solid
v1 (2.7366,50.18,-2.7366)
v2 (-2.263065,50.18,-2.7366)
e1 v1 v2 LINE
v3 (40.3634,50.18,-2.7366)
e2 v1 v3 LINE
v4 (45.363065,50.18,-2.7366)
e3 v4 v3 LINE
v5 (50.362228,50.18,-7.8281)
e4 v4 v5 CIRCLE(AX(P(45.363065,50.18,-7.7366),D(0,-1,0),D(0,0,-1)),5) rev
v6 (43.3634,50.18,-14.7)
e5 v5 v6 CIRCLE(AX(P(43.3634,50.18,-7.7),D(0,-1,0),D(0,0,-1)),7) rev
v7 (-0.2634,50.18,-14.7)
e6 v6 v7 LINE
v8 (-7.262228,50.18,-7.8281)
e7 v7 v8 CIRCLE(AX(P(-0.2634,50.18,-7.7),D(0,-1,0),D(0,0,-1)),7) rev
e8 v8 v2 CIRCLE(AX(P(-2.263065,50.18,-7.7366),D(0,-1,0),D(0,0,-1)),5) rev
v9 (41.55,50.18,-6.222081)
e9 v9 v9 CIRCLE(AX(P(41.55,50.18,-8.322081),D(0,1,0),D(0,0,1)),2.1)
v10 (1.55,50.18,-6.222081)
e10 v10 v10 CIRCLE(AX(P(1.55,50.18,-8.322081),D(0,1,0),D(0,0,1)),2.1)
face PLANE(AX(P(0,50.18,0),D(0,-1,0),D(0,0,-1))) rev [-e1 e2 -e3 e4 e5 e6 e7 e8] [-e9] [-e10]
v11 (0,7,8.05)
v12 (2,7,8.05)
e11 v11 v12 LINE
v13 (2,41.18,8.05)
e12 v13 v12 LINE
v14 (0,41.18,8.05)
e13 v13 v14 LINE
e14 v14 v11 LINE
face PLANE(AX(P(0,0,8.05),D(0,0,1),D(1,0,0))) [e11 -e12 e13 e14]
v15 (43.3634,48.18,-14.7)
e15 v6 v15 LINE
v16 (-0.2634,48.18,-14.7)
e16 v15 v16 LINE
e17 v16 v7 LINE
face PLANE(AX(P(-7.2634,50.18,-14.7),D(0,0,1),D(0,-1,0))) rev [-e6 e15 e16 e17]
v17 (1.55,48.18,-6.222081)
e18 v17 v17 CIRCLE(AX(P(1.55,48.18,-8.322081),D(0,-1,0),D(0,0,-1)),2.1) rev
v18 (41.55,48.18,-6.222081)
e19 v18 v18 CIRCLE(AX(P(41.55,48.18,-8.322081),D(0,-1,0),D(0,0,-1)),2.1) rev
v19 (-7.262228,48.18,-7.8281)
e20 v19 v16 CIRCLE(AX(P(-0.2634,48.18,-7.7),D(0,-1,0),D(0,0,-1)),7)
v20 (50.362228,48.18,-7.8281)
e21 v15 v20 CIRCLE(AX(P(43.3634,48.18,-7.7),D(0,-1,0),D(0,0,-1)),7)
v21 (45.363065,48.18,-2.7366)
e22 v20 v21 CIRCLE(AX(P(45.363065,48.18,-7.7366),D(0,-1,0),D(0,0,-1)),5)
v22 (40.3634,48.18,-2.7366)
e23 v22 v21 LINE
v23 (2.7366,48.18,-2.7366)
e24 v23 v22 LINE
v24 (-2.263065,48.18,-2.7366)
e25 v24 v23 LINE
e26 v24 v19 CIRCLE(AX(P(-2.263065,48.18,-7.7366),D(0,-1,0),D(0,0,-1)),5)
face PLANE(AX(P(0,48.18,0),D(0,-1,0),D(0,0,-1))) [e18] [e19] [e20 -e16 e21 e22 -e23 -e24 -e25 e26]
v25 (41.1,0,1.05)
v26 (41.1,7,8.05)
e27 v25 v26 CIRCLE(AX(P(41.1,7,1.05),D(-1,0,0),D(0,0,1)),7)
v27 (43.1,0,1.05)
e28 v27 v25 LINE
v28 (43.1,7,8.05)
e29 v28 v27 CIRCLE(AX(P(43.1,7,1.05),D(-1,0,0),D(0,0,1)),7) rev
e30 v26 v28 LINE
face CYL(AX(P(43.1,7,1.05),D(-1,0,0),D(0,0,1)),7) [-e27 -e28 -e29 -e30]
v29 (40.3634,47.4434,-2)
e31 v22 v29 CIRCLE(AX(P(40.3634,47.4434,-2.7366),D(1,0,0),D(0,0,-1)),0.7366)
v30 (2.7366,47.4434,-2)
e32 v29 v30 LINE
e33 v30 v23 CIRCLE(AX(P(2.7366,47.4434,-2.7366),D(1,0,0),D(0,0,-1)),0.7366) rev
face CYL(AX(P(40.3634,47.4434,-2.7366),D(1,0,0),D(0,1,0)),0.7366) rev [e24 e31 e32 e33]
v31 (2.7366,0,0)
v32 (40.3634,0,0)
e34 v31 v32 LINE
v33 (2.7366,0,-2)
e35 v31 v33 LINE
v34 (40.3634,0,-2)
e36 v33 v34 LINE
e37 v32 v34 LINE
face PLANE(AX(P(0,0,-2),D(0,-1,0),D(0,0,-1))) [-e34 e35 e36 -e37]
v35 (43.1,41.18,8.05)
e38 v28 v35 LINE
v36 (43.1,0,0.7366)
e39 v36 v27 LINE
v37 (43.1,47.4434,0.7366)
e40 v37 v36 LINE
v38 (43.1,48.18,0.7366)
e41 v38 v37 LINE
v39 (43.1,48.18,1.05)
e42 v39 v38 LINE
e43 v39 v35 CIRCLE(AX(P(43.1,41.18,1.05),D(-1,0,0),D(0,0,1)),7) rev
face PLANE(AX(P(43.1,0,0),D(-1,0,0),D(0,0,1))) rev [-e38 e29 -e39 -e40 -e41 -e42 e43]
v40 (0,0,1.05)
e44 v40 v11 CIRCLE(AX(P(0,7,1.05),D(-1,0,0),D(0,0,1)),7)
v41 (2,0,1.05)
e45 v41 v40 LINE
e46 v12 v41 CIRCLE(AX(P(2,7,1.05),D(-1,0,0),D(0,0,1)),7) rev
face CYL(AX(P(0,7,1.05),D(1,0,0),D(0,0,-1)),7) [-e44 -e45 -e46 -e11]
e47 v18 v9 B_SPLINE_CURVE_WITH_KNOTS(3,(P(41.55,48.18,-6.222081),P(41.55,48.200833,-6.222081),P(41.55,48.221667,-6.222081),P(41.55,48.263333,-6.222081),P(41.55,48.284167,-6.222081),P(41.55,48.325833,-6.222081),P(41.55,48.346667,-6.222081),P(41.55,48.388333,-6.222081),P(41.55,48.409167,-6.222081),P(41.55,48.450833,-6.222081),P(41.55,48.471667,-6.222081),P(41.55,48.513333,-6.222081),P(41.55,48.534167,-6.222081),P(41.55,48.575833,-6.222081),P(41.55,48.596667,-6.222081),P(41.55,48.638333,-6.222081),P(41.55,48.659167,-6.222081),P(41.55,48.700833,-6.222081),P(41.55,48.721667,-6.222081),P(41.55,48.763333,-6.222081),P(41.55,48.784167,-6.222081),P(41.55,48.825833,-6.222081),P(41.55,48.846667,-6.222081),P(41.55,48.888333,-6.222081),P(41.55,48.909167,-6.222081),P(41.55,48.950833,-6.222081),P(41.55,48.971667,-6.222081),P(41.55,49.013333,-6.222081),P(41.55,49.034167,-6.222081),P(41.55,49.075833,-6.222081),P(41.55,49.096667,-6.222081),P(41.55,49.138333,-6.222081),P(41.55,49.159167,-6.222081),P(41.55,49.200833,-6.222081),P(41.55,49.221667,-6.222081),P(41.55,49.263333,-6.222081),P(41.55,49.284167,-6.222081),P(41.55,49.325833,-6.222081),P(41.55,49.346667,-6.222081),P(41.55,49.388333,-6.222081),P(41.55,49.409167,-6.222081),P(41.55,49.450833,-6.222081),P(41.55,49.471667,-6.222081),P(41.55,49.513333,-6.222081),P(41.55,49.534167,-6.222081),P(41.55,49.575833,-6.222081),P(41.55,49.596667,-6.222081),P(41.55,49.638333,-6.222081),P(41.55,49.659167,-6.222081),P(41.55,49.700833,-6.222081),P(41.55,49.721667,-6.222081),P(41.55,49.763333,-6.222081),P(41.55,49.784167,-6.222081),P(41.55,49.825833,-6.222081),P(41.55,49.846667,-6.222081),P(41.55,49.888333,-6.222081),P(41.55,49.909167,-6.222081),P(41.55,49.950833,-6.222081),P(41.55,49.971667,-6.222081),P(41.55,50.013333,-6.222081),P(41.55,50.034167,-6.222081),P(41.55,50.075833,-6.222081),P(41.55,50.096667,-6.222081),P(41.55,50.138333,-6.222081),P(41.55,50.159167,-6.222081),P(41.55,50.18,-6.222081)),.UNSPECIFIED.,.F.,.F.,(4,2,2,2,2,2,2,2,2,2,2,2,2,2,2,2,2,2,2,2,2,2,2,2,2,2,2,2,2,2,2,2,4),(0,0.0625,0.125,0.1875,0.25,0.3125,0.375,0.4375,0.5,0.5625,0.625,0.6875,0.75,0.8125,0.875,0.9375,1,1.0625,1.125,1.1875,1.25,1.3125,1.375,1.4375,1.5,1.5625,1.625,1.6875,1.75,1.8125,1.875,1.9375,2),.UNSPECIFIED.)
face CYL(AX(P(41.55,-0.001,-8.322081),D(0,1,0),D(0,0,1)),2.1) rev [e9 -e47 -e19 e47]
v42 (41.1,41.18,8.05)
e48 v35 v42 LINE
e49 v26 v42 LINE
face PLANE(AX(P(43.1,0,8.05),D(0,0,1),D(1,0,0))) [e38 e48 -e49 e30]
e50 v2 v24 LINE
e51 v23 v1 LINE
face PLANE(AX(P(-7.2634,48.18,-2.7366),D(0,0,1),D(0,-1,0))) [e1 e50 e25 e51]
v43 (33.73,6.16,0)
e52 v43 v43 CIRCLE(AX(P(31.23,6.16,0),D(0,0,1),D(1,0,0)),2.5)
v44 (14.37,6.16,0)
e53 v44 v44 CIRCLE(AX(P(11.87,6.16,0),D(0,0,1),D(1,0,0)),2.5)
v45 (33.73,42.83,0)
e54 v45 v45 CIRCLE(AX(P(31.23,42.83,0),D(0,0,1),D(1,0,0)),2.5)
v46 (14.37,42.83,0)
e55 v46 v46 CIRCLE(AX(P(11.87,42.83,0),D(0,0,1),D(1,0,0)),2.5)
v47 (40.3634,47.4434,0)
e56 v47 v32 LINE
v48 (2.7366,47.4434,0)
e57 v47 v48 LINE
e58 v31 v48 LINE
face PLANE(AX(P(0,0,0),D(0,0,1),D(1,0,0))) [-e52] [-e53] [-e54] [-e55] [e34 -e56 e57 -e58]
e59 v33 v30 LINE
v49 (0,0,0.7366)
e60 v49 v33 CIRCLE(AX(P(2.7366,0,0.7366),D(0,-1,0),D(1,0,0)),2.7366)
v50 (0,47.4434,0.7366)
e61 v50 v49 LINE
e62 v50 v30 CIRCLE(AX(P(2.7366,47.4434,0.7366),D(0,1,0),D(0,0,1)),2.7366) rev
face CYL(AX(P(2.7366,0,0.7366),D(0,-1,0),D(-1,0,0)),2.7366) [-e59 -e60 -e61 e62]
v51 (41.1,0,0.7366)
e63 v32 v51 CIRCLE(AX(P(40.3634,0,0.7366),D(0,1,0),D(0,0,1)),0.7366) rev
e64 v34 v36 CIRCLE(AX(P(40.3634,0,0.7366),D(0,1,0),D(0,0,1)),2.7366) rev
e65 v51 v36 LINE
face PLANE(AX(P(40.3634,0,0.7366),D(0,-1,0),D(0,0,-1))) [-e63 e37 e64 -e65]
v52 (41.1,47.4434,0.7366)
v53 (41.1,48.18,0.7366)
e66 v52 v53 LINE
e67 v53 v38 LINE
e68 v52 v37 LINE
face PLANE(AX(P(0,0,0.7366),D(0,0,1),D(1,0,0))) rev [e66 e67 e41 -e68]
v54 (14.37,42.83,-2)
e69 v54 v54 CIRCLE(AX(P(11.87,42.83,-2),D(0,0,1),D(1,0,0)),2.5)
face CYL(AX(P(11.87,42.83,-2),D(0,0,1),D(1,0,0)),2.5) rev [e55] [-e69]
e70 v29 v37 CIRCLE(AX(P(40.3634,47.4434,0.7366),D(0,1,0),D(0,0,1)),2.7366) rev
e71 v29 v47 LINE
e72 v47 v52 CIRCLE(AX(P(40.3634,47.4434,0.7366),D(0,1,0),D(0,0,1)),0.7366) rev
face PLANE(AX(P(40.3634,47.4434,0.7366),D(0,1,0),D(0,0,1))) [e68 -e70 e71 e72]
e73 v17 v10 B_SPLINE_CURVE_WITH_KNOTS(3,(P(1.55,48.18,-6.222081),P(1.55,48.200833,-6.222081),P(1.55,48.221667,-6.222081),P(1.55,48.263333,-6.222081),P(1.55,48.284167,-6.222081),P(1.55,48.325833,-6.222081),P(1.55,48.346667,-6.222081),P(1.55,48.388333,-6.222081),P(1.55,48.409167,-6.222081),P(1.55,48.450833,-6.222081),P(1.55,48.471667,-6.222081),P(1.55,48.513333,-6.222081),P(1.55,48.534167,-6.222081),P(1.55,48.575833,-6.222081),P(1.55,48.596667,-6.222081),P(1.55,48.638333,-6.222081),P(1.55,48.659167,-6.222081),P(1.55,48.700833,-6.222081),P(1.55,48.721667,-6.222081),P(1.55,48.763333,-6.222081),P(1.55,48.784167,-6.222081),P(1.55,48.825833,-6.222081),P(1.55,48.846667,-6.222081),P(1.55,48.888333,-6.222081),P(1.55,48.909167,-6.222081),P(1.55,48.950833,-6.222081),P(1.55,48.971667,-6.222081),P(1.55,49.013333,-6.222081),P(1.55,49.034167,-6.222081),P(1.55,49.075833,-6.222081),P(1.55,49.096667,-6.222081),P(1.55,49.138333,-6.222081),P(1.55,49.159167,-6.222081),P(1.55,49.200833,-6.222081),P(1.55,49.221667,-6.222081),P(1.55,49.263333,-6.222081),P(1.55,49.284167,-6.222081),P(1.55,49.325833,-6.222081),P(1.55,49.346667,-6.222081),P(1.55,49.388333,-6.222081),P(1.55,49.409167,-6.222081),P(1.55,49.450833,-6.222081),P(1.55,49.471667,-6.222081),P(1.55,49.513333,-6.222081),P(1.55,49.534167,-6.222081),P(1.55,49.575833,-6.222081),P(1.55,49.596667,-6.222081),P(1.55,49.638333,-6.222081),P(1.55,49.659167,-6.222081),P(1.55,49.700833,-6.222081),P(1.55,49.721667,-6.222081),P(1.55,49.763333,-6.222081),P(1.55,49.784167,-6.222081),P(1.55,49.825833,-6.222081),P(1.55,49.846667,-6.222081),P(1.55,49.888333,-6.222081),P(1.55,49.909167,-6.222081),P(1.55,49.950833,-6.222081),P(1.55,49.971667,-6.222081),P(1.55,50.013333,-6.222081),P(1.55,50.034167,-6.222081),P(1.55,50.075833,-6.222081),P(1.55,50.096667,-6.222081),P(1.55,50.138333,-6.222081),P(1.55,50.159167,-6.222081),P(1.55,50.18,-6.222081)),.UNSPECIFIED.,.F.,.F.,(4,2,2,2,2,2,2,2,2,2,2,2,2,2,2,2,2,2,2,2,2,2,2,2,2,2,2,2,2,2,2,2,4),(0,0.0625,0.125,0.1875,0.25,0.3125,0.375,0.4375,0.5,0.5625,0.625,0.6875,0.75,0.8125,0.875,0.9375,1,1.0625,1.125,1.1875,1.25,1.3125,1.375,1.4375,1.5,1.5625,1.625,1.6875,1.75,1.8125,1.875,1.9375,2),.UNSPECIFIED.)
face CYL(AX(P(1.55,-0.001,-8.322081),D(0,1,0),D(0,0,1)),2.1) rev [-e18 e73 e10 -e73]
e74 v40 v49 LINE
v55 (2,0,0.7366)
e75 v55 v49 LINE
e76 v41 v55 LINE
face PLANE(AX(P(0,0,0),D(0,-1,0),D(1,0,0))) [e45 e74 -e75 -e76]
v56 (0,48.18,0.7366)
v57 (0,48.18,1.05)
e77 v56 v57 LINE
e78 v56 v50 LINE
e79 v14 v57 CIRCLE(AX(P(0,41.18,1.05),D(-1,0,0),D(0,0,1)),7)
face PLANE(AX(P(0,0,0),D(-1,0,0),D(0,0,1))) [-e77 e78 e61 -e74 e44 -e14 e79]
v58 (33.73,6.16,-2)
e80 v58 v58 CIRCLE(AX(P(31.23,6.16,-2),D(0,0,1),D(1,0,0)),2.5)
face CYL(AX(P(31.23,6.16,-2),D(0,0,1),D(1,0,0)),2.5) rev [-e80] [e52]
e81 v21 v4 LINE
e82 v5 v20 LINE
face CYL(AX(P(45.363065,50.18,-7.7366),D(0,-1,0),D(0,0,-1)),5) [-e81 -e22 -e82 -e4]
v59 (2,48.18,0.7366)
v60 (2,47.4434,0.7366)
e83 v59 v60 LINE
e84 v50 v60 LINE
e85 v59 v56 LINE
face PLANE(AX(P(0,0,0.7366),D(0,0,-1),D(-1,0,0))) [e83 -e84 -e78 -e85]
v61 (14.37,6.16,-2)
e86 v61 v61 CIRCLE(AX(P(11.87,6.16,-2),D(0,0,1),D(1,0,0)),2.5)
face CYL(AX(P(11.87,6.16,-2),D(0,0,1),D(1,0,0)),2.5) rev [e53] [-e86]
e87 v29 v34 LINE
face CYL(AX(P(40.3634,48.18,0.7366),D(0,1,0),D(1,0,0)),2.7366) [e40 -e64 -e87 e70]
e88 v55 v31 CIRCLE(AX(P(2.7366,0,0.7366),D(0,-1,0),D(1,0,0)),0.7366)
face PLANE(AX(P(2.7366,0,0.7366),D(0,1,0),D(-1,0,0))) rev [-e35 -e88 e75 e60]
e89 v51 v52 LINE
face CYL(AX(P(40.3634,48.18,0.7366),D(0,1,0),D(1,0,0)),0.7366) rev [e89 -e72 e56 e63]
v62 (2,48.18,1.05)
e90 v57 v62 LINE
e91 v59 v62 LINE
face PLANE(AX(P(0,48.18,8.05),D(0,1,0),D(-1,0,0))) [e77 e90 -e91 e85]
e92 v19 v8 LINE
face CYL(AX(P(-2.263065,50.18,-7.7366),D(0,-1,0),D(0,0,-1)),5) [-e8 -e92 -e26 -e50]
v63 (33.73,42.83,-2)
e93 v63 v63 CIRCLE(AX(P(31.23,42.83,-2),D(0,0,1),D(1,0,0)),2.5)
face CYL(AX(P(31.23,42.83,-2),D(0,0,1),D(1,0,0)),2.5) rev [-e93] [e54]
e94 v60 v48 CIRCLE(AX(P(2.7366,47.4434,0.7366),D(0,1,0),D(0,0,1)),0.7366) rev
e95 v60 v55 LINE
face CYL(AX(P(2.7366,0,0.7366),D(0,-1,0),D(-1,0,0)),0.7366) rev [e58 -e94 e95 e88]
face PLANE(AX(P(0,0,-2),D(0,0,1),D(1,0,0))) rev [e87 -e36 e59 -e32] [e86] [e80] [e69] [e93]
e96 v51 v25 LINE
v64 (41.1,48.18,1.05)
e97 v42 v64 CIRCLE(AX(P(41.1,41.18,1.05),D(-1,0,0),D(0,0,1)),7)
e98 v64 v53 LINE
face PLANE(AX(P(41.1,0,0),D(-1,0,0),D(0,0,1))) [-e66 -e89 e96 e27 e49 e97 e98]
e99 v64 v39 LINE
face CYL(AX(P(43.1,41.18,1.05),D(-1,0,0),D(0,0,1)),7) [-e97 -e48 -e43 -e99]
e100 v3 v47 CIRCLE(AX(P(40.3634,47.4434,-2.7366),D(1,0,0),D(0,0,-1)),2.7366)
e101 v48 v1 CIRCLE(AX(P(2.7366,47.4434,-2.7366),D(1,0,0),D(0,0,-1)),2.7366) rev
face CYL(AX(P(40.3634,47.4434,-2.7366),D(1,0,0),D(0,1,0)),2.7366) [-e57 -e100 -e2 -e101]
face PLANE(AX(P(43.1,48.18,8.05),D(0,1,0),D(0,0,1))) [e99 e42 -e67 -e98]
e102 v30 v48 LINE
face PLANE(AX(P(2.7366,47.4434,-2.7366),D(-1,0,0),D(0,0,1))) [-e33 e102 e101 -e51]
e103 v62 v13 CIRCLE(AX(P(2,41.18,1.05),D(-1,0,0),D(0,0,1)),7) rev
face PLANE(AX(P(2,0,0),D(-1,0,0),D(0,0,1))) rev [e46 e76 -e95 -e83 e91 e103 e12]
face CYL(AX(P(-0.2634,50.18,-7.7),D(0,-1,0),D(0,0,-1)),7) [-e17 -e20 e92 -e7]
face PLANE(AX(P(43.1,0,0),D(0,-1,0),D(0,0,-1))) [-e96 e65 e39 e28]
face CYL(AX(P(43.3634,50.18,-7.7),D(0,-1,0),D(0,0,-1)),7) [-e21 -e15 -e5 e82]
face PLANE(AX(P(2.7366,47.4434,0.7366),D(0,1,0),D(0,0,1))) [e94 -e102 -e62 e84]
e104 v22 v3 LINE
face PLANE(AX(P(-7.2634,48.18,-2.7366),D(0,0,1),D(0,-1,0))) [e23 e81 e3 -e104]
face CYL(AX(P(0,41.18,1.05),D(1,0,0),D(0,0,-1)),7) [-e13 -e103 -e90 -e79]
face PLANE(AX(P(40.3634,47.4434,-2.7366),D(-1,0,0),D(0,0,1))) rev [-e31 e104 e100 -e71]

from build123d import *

# Parameters (mm, degrees)
SKETCH6_W                      = 43.1
SKETCH6_H                      = 48.18
SKETCH6_R                      = 2.5
BASE_FLANGE2_DEPTH             = 2
EDGE_FLANGE1_STRIP_W           = 9.4732
EDGE_FLANGE1_STRIP_H           = 2
EDGE_FLANGE1_STRIP_CUT_DEPTH   = 48.18
EDGE_FLANGE1_STRIP_2_W         = 9.4732
EDGE_FLANGE1_STRIP_2_H         = 2
EDGE_FLANGE1_STRIP_CUT_2_DEPTH = 48.18
EDGE_FLANGE1_DEPTH             = 48.18
EDGE_FLANGE1_BEND_DEPTH        = 48.18
EDGE_FLANGE3_DEPTH             = 43.1
EDGE_FLANGE3_2_DEPTH           = 2.7366
EDGE_FLANGE3_START             = 40.3634
EDGE_FLANGE3_3_DEPTH           = 2.7366
EDGE_FLANGE3_START_2           = -7.2634
EDGE_FLANGE3_4_OUTLINE_W       = 2
EDGE_FLANGE3_4_OUTLINE_H       = 11.9634
EDGE_FLANGE3_4_DEPTH           = 57.6268
EDGE_FLANGE3_START_3           = 2.7366
EDGE_FLANGE3_5_DEPTH           = 37.6268
FILLET3_R                      = 7
CUT_EXTRUDE1_REACH             = 74.599
SKETCH21_R                     = 2.1
FILLET4_R                      = 5


# Read off the part's stored shape, not the designer's step: Edge-Flange3
# Sheet-metal steps are written as plain solids
with BuildPart() as part:
    # Sketch6 → Base-Flange2 (new body)
    with BuildSketch(Plane.XY):
        with Locations((21.55, 24.09)):
            Rectangle(SKETCH6_W, SKETCH6_H)
        with Locations((31.23, 6.16)):
            Circle(SKETCH6_R, mode=Mode.SUBTRACT)
        with Locations((11.87, 6.16)):
            Circle(SKETCH6_R, mode=Mode.SUBTRACT)
        with Locations((11.87, 42.83)):
            Circle(SKETCH6_R, mode=Mode.SUBTRACT)
        with Locations((31.23, 42.83)):
            Circle(SKETCH6_R, mode=Mode.SUBTRACT)
    extrude(amount=-BASE_FLANGE2_DEPTH)

    # Edge-Flange1 strip (across the edge) → Edge-Flange1 strip cut (cut)
    with BuildSketch(Plane.XZ.offset(-48.18)):
        with Locations((-2, -1)):
            Rectangle(EDGE_FLANGE1_STRIP_W, EDGE_FLANGE1_STRIP_H)
    extrude(amount=EDGE_FLANGE1_STRIP_CUT_DEPTH, mode=Mode.SUBTRACT)

    # Edge-Flange1 strip 2 (across the edge) → Edge-Flange1 strip cut 2 (cut)
    with BuildSketch(Plane(origin=(43.1, 0, 0), x_dir=(-1, 0, 0), z_dir=(0, 1, 0))):
        with Locations((-2, -1)):
            Rectangle(EDGE_FLANGE1_STRIP_2_W, EDGE_FLANGE1_STRIP_2_H)
    extrude(amount=EDGE_FLANGE1_STRIP_CUT_2_DEPTH, mode=Mode.SUBTRACT)

    # Edge-Flange1 section (across the edge) → Edge-Flange1 (add)
    with BuildSketch(Plane.XZ.offset(-48.18)):
        with BuildLine():
            Line((0, 0.7366), (0, 8.05))
            Line((0, 8.05), (2, 8.05))
            Line((2, 8.05), (2, 0.7366))
            ThreePointArc((2, 0.7366), (2.215745145, 0.215745145), (2.7366, 0))
            Line((2.7366, 0), (2.7366, -2))
            ThreePointArc((2.7366, -2), (0.801531583, -1.198468417), (0, 0.7366))
        make_face()
    extrude(amount=EDGE_FLANGE1_DEPTH)

    # Edge-Flange1 section 2 (across the edge) → Edge-Flange1 bend (add)
    with BuildSketch(Plane(origin=(43.1, 0, 0), x_dir=(-1, 0, 0), z_dir=(0, 1, 0))):
        with BuildLine():
            Line((0, 0.7366), (0, 8.05))
            Line((0, 8.05), (2, 8.05))
            Line((2, 8.05), (2, 0.7366))
            ThreePointArc((2, 0.7366), (2.215745145, 0.215745145), (2.7366, 0))
            Line((2.7366, 0), (2.7366, -2))
            ThreePointArc((2.7366, -2), (0.801531583, -1.198468417), (0, 0.7366))
        make_face()
    extrude(amount=EDGE_FLANGE1_BEND_DEPTH)

    # Edge-Flange3 outline → Edge-Flange3 (cut)
    with BuildSketch(Plane.YZ):
        with BuildLine():
            Line((48.18, 0.7366), (47.4434, 0.7366))
            Line((47.4434, 0.7366), (47.4434, 0))
            ThreePointArc((47.4434, 0), (47.815145906, -0.025366971), (48.18, -0.100997602))
            Line((48.18, -0.100997602), (48.18, 0.7366))
        make_face()
    extrude(amount=EDGE_FLANGE3_DEPTH, mode=Mode.SUBTRACT)

    # Edge-Flange3 2 outline → Edge-Flange3 2 (cut)
    with BuildSketch(Plane.YZ):
        with BuildLine():
            ThreePointArc((48.18, -0.100997602), (47.815145906, -0.025366971), (47.4434, 0))
            Line((47.4434, 0), (47.4434, -2))
            ThreePointArc((47.4434, -2), (47.964254855, -2.215745145), (48.18, -2.7366))
            Line((48.18, -2.7366), (50.18, -2.7366))
            ThreePointArc((50.18, -2.7366), (49.623395312, -1.082332791), (48.18, -0.100997602))
        make_face()
    extrude(amount=EDGE_FLANGE3_2_DEPTH, mode=Mode.SUBTRACT)

    # Edge-Flange3 3 outline → Edge-Flange3 3 (cut)
    with BuildSketch(Plane.YZ.offset(EDGE_FLANGE3_START)):
        with BuildLine():
            ThreePointArc((48.18, -0.100997602), (47.815145906, -0.025366971), (47.4434, 0))
            Line((47.4434, 0), (47.4434, -2))
            ThreePointArc((47.4434, -2), (47.964254855, -2.215745145), (48.18, -2.7366))
            Line((48.18, -2.7366), (50.18, -2.7366))
            ThreePointArc((50.18, -2.7366), (49.623395312, -1.082332791), (48.18, -0.100997602))
        make_face()
    extrude(amount=EDGE_FLANGE3_3_DEPTH, mode=Mode.SUBTRACT)



with BuildPart() as body_2:
    # Edge-Flange3 4 outline → Edge-Flange3 4 (new body)
    with BuildSketch(Plane.YZ.offset(EDGE_FLANGE3_START_2)):
        with Locations((49.18, -8.7183)):
            Rectangle(EDGE_FLANGE3_4_OUTLINE_W, EDGE_FLANGE3_4_OUTLINE_H)
    extrude(amount=EDGE_FLANGE3_4_DEPTH)


with BuildPart() as part_1:
    add(part.part)

    add(body_2.part)  # Edge-Flange3 5 merges body 2
    # Edge-Flange3 5 outline → Edge-Flange3 5 (add)
    with BuildSketch(Plane.YZ.offset(EDGE_FLANGE3_START_3)):
        with BuildLine():
            ThreePointArc((48.18, -0.100997602), (47.815145906, -0.025366971), (47.4434, 0))
            Line((47.4434, 0), (47.4434, -2))
            ThreePointArc((47.4434, -2), (47.964254855, -2.215745145), (48.18, -2.7366))
            Line((48.18, -2.7366), (50.18, -2.7366))
            ThreePointArc((50.18, -2.7366), (49.623395312, -1.082332791), (48.18, -0.100997602))
        make_face()
    extrude(amount=EDGE_FLANGE3_5_DEPTH)

    # Fillet3
    fillet3_edges = [part_1.edges().sort_by_distance(p)[0] for p in [
        (-7.2634, 49.18, -14.7),
        (50.3634, 49.18, -14.7),
        (1, 48.18, 8.05),
        (1, 0, 8.05),
        (42.1, 0, 8.05),
        (42.1, 48.18, 8.05),
    ]]
    fillet(fillet3_edges, radius=FILLET3_R)

    # Sketch21 → Cut-Extrude1 (cut, up to next)
    with BuildSketch(Plane(origin=(0, 50.18, 0), x_dir=(1, 0, 0), z_dir=(0, 1, 0)), mode=Mode.PRIVATE) as cut_extrude1_sk1:
        with Locations(Location((1.55, 8.322080502, 0), (0, 0, 270))):
            Circle(SKETCH21_R)
    cut_extrude1_tool1 = extrude(cut_extrude1_sk1.sketch, amount=-CUT_EXTRUDE1_REACH, mode=Mode.PRIVATE) & part_1.part
    # Sketch21 → Cut-Extrude1 (cut, up to next)
    with BuildSketch(Plane(origin=(0, 50.18, 0), x_dir=(1, 0, 0), z_dir=(0, 1, 0)), mode=Mode.PRIVATE) as cut_extrude1_sk2:
        with Locations(Location((41.55, 8.322080502, 0), (0, 0, 270))):
            Circle(SKETCH21_R)
    cut_extrude1_tool2 = extrude(cut_extrude1_sk2.sketch, amount=-CUT_EXTRUDE1_REACH, mode=Mode.PRIVATE) & part_1.part
    add(cut_extrude1_tool1.solids().sort_by_distance((1.55, 50.18, -8.322081))[0], mode=Mode.SUBTRACT)
    add(cut_extrude1_tool2.solids().sort_by_distance((41.55, 50.18, -8.322081))[0], mode=Mode.SUBTRACT)

    # Fillet4
    fillet4_edges = [part_1.edges().sort_by_distance(p)[0] for p in [
        (50.3634, 49.18, -2.7366),
        (-7.2634, 49.18, -2.7366),
    ]]
    fillet(fillet4_edges, radius=FILLET4_R)


solid = part_1.part
